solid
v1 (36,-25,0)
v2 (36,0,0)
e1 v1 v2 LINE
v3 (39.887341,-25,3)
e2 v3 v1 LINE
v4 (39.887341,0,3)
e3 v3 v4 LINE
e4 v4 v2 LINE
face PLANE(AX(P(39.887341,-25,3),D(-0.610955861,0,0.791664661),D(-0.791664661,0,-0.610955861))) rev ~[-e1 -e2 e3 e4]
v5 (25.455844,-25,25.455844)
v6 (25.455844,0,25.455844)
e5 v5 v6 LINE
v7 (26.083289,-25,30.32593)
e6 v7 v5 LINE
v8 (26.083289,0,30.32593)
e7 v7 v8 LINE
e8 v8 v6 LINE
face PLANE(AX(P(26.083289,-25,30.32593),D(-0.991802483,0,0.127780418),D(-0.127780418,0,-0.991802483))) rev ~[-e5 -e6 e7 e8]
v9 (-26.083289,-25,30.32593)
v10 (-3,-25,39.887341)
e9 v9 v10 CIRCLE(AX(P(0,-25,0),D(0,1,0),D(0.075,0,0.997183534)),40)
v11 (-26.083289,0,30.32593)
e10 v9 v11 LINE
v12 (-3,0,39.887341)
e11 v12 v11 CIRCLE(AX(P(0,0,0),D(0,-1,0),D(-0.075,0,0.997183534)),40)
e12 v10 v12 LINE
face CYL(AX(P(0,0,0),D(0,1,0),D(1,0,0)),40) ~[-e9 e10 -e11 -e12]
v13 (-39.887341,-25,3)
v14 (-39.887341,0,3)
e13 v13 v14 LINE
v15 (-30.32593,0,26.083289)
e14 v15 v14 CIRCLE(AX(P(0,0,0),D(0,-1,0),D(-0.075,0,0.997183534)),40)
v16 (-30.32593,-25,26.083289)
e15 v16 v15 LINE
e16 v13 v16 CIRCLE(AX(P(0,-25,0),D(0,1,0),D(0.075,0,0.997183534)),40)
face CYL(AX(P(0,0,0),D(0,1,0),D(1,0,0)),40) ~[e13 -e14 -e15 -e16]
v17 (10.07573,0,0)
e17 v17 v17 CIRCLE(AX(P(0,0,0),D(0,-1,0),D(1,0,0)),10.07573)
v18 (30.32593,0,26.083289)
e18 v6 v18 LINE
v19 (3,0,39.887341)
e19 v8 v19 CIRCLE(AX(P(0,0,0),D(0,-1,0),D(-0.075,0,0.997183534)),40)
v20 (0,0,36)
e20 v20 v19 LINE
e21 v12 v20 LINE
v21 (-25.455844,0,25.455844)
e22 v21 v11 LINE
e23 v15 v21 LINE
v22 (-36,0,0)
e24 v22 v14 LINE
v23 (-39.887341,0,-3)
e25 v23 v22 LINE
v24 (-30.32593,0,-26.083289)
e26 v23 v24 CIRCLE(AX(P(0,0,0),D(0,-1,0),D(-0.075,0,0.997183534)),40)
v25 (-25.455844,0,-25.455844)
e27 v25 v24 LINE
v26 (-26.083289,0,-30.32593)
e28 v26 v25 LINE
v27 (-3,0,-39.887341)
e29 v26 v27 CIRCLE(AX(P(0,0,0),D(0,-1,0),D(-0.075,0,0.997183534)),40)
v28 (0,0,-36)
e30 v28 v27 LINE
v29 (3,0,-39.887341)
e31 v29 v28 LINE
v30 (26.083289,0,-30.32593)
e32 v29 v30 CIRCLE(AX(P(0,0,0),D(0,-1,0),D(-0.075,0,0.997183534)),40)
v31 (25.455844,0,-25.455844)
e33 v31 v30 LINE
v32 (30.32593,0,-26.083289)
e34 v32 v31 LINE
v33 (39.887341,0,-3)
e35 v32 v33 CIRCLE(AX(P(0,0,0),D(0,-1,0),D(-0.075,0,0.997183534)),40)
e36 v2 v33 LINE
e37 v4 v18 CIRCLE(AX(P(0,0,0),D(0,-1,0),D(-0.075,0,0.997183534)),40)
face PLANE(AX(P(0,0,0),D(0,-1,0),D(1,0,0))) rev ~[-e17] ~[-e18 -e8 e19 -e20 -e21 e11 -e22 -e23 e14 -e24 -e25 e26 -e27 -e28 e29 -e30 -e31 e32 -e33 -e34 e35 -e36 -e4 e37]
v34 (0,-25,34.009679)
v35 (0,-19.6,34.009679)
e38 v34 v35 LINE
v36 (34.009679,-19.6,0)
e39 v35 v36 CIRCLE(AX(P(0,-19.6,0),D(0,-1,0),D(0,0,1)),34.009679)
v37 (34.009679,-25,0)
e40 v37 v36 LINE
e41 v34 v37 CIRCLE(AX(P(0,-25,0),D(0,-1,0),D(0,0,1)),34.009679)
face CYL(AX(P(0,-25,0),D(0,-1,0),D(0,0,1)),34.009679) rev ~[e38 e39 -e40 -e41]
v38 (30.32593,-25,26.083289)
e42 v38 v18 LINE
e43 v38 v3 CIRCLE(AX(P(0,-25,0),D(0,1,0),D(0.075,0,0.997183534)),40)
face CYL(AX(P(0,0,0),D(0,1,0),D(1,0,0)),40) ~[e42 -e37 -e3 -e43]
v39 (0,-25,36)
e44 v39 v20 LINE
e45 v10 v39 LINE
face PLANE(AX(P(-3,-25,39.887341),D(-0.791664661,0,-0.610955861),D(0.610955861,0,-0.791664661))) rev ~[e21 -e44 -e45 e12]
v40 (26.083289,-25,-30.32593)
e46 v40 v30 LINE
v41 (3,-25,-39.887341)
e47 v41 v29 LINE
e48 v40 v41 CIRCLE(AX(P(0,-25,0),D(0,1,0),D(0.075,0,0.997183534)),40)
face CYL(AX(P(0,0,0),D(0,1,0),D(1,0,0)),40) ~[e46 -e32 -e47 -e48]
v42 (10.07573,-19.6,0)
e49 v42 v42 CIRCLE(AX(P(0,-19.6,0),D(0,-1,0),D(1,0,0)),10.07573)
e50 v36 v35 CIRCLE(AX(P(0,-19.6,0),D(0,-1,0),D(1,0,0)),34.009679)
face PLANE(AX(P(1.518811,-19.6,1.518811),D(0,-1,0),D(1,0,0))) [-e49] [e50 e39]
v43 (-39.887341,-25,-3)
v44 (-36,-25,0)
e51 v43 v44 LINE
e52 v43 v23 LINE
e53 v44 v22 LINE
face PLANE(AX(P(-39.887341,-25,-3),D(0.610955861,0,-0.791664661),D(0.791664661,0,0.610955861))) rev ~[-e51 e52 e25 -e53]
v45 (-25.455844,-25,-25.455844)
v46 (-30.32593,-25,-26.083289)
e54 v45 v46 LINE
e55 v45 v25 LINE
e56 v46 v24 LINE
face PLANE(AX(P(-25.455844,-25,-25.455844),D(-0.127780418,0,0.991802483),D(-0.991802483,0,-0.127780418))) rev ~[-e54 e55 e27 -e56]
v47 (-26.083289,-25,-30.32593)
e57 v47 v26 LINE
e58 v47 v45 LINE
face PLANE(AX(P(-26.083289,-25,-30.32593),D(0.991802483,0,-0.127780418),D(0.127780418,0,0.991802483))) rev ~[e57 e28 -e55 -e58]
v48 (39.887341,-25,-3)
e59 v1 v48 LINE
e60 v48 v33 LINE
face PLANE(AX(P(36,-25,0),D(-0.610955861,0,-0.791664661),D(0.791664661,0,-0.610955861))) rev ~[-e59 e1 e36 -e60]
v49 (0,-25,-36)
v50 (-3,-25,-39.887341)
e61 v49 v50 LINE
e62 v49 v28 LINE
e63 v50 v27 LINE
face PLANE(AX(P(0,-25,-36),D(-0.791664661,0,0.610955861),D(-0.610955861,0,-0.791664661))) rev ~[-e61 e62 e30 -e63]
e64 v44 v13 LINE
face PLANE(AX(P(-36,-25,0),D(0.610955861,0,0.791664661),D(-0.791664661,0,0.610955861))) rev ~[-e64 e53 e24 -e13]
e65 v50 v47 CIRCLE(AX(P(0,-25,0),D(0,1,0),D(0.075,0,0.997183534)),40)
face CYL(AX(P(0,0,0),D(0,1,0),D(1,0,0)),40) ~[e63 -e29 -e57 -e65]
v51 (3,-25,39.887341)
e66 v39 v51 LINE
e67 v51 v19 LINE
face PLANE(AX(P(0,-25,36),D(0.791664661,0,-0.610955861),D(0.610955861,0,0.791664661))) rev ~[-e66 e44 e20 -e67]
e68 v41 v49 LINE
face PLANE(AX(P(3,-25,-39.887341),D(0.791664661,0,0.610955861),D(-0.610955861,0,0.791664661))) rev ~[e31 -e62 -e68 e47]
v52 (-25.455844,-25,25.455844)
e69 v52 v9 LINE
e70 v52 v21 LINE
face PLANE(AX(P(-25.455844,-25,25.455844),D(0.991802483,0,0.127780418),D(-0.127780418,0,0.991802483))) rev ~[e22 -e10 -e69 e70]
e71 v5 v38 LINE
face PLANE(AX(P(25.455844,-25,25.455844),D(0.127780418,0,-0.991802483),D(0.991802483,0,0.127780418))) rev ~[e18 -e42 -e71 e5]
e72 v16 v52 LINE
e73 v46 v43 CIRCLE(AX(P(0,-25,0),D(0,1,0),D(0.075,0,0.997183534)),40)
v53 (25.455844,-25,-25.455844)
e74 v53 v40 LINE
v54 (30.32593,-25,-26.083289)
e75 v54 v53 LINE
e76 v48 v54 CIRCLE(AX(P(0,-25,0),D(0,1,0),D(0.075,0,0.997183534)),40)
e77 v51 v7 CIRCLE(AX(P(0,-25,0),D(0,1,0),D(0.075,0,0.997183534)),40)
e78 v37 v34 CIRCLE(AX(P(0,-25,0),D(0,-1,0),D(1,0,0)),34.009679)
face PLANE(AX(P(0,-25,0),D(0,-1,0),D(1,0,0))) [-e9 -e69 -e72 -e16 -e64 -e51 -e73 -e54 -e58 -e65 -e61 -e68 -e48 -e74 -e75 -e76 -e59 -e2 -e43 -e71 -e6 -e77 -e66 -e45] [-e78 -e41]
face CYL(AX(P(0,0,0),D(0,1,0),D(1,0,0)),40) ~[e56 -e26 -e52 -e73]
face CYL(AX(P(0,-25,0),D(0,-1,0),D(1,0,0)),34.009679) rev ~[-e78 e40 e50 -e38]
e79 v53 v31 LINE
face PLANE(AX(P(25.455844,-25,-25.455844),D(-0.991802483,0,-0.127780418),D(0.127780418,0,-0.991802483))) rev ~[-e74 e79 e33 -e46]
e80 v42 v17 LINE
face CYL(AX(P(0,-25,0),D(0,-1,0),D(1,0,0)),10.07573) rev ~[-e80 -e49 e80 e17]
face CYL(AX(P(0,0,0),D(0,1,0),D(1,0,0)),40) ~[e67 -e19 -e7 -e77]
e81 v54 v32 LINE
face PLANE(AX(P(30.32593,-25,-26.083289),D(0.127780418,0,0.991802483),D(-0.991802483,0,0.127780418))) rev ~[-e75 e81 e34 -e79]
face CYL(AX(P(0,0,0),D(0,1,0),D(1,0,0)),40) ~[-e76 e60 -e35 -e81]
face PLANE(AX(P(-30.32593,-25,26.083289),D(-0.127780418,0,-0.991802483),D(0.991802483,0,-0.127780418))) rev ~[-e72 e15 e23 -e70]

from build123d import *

# Parameters (mm, degrees)
F0_R            = 40
F1_DEPTH        = 25
F3_DEPTH        = 25
F3_COPIES_COUNT = 8
F4_R            = 10.0757297648
F5_DEPTH        = 25
F7_DEPTH        = 5.4


# Not quite as in the source:
# - a pattern or mirror of a feature is missing from the dataset's text; its kind, count and spacing are read off the source's solid


with BuildPart() as f1:
    # F0 (on Front) → F1 (new body)
    with BuildSketch(Plane.XZ):
        Circle(F0_R)
    extrude(amount=F1_DEPTH)

    # F2 (on face) → F3 (cut)
    with BuildSketch(Plane.XZ.offset(25)):
        with BuildLine():
            ThreePointArc((0, 40), (-1.5010572917, 39.971825415), (-3, 39.8873413504))
            Line((-3, 39.8873413504), (0, 36))
            Line((0, 36), (0, 40))
        make_face()
        with BuildLine():
            Line((0, 36), (3, 39.8873413504))
            ThreePointArc((3, 39.8873413504), (1.5010572917, 39.971825415), (0, 40))
            Line((0, 40), (0, 36))
        make_face()
    f3 = extrude(amount=-F3_DEPTH, mode=Mode.SUBTRACT)

    # F3_copies: F3 ×8 about axis
    f3_copies_axis = Axis((0, 0, 0), (0, 1, 0))
    for i in range(1, F3_COPIES_COUNT):
        add(f3.rotate(f3_copies_axis, i * 360 / F3_COPIES_COUNT), mode=Mode.SUBTRACT)

    # F4 (on face) → F5 (cut)
    with BuildSketch(Plane.XZ.offset(25)):
        Circle(F4_R)
    extrude(amount=-F5_DEPTH, mode=Mode.SUBTRACT)

    # F6 (on face) → F7 (cut)
    with BuildSketch(Plane.XZ.offset(25)):
        with BuildLine():
            ThreePointArc((0, 34.0096793756), (-24.0484749125, -24.0484749125), (34.0096793756, 0))
            ThreePointArc((34.0096793756, 0), (24.0484749125, 24.0484749125), (0, 34.0096793756))
        make_face()
    extrude(amount=-F7_DEPTH, mode=Mode.SUBTRACT)


solid = f1.part
